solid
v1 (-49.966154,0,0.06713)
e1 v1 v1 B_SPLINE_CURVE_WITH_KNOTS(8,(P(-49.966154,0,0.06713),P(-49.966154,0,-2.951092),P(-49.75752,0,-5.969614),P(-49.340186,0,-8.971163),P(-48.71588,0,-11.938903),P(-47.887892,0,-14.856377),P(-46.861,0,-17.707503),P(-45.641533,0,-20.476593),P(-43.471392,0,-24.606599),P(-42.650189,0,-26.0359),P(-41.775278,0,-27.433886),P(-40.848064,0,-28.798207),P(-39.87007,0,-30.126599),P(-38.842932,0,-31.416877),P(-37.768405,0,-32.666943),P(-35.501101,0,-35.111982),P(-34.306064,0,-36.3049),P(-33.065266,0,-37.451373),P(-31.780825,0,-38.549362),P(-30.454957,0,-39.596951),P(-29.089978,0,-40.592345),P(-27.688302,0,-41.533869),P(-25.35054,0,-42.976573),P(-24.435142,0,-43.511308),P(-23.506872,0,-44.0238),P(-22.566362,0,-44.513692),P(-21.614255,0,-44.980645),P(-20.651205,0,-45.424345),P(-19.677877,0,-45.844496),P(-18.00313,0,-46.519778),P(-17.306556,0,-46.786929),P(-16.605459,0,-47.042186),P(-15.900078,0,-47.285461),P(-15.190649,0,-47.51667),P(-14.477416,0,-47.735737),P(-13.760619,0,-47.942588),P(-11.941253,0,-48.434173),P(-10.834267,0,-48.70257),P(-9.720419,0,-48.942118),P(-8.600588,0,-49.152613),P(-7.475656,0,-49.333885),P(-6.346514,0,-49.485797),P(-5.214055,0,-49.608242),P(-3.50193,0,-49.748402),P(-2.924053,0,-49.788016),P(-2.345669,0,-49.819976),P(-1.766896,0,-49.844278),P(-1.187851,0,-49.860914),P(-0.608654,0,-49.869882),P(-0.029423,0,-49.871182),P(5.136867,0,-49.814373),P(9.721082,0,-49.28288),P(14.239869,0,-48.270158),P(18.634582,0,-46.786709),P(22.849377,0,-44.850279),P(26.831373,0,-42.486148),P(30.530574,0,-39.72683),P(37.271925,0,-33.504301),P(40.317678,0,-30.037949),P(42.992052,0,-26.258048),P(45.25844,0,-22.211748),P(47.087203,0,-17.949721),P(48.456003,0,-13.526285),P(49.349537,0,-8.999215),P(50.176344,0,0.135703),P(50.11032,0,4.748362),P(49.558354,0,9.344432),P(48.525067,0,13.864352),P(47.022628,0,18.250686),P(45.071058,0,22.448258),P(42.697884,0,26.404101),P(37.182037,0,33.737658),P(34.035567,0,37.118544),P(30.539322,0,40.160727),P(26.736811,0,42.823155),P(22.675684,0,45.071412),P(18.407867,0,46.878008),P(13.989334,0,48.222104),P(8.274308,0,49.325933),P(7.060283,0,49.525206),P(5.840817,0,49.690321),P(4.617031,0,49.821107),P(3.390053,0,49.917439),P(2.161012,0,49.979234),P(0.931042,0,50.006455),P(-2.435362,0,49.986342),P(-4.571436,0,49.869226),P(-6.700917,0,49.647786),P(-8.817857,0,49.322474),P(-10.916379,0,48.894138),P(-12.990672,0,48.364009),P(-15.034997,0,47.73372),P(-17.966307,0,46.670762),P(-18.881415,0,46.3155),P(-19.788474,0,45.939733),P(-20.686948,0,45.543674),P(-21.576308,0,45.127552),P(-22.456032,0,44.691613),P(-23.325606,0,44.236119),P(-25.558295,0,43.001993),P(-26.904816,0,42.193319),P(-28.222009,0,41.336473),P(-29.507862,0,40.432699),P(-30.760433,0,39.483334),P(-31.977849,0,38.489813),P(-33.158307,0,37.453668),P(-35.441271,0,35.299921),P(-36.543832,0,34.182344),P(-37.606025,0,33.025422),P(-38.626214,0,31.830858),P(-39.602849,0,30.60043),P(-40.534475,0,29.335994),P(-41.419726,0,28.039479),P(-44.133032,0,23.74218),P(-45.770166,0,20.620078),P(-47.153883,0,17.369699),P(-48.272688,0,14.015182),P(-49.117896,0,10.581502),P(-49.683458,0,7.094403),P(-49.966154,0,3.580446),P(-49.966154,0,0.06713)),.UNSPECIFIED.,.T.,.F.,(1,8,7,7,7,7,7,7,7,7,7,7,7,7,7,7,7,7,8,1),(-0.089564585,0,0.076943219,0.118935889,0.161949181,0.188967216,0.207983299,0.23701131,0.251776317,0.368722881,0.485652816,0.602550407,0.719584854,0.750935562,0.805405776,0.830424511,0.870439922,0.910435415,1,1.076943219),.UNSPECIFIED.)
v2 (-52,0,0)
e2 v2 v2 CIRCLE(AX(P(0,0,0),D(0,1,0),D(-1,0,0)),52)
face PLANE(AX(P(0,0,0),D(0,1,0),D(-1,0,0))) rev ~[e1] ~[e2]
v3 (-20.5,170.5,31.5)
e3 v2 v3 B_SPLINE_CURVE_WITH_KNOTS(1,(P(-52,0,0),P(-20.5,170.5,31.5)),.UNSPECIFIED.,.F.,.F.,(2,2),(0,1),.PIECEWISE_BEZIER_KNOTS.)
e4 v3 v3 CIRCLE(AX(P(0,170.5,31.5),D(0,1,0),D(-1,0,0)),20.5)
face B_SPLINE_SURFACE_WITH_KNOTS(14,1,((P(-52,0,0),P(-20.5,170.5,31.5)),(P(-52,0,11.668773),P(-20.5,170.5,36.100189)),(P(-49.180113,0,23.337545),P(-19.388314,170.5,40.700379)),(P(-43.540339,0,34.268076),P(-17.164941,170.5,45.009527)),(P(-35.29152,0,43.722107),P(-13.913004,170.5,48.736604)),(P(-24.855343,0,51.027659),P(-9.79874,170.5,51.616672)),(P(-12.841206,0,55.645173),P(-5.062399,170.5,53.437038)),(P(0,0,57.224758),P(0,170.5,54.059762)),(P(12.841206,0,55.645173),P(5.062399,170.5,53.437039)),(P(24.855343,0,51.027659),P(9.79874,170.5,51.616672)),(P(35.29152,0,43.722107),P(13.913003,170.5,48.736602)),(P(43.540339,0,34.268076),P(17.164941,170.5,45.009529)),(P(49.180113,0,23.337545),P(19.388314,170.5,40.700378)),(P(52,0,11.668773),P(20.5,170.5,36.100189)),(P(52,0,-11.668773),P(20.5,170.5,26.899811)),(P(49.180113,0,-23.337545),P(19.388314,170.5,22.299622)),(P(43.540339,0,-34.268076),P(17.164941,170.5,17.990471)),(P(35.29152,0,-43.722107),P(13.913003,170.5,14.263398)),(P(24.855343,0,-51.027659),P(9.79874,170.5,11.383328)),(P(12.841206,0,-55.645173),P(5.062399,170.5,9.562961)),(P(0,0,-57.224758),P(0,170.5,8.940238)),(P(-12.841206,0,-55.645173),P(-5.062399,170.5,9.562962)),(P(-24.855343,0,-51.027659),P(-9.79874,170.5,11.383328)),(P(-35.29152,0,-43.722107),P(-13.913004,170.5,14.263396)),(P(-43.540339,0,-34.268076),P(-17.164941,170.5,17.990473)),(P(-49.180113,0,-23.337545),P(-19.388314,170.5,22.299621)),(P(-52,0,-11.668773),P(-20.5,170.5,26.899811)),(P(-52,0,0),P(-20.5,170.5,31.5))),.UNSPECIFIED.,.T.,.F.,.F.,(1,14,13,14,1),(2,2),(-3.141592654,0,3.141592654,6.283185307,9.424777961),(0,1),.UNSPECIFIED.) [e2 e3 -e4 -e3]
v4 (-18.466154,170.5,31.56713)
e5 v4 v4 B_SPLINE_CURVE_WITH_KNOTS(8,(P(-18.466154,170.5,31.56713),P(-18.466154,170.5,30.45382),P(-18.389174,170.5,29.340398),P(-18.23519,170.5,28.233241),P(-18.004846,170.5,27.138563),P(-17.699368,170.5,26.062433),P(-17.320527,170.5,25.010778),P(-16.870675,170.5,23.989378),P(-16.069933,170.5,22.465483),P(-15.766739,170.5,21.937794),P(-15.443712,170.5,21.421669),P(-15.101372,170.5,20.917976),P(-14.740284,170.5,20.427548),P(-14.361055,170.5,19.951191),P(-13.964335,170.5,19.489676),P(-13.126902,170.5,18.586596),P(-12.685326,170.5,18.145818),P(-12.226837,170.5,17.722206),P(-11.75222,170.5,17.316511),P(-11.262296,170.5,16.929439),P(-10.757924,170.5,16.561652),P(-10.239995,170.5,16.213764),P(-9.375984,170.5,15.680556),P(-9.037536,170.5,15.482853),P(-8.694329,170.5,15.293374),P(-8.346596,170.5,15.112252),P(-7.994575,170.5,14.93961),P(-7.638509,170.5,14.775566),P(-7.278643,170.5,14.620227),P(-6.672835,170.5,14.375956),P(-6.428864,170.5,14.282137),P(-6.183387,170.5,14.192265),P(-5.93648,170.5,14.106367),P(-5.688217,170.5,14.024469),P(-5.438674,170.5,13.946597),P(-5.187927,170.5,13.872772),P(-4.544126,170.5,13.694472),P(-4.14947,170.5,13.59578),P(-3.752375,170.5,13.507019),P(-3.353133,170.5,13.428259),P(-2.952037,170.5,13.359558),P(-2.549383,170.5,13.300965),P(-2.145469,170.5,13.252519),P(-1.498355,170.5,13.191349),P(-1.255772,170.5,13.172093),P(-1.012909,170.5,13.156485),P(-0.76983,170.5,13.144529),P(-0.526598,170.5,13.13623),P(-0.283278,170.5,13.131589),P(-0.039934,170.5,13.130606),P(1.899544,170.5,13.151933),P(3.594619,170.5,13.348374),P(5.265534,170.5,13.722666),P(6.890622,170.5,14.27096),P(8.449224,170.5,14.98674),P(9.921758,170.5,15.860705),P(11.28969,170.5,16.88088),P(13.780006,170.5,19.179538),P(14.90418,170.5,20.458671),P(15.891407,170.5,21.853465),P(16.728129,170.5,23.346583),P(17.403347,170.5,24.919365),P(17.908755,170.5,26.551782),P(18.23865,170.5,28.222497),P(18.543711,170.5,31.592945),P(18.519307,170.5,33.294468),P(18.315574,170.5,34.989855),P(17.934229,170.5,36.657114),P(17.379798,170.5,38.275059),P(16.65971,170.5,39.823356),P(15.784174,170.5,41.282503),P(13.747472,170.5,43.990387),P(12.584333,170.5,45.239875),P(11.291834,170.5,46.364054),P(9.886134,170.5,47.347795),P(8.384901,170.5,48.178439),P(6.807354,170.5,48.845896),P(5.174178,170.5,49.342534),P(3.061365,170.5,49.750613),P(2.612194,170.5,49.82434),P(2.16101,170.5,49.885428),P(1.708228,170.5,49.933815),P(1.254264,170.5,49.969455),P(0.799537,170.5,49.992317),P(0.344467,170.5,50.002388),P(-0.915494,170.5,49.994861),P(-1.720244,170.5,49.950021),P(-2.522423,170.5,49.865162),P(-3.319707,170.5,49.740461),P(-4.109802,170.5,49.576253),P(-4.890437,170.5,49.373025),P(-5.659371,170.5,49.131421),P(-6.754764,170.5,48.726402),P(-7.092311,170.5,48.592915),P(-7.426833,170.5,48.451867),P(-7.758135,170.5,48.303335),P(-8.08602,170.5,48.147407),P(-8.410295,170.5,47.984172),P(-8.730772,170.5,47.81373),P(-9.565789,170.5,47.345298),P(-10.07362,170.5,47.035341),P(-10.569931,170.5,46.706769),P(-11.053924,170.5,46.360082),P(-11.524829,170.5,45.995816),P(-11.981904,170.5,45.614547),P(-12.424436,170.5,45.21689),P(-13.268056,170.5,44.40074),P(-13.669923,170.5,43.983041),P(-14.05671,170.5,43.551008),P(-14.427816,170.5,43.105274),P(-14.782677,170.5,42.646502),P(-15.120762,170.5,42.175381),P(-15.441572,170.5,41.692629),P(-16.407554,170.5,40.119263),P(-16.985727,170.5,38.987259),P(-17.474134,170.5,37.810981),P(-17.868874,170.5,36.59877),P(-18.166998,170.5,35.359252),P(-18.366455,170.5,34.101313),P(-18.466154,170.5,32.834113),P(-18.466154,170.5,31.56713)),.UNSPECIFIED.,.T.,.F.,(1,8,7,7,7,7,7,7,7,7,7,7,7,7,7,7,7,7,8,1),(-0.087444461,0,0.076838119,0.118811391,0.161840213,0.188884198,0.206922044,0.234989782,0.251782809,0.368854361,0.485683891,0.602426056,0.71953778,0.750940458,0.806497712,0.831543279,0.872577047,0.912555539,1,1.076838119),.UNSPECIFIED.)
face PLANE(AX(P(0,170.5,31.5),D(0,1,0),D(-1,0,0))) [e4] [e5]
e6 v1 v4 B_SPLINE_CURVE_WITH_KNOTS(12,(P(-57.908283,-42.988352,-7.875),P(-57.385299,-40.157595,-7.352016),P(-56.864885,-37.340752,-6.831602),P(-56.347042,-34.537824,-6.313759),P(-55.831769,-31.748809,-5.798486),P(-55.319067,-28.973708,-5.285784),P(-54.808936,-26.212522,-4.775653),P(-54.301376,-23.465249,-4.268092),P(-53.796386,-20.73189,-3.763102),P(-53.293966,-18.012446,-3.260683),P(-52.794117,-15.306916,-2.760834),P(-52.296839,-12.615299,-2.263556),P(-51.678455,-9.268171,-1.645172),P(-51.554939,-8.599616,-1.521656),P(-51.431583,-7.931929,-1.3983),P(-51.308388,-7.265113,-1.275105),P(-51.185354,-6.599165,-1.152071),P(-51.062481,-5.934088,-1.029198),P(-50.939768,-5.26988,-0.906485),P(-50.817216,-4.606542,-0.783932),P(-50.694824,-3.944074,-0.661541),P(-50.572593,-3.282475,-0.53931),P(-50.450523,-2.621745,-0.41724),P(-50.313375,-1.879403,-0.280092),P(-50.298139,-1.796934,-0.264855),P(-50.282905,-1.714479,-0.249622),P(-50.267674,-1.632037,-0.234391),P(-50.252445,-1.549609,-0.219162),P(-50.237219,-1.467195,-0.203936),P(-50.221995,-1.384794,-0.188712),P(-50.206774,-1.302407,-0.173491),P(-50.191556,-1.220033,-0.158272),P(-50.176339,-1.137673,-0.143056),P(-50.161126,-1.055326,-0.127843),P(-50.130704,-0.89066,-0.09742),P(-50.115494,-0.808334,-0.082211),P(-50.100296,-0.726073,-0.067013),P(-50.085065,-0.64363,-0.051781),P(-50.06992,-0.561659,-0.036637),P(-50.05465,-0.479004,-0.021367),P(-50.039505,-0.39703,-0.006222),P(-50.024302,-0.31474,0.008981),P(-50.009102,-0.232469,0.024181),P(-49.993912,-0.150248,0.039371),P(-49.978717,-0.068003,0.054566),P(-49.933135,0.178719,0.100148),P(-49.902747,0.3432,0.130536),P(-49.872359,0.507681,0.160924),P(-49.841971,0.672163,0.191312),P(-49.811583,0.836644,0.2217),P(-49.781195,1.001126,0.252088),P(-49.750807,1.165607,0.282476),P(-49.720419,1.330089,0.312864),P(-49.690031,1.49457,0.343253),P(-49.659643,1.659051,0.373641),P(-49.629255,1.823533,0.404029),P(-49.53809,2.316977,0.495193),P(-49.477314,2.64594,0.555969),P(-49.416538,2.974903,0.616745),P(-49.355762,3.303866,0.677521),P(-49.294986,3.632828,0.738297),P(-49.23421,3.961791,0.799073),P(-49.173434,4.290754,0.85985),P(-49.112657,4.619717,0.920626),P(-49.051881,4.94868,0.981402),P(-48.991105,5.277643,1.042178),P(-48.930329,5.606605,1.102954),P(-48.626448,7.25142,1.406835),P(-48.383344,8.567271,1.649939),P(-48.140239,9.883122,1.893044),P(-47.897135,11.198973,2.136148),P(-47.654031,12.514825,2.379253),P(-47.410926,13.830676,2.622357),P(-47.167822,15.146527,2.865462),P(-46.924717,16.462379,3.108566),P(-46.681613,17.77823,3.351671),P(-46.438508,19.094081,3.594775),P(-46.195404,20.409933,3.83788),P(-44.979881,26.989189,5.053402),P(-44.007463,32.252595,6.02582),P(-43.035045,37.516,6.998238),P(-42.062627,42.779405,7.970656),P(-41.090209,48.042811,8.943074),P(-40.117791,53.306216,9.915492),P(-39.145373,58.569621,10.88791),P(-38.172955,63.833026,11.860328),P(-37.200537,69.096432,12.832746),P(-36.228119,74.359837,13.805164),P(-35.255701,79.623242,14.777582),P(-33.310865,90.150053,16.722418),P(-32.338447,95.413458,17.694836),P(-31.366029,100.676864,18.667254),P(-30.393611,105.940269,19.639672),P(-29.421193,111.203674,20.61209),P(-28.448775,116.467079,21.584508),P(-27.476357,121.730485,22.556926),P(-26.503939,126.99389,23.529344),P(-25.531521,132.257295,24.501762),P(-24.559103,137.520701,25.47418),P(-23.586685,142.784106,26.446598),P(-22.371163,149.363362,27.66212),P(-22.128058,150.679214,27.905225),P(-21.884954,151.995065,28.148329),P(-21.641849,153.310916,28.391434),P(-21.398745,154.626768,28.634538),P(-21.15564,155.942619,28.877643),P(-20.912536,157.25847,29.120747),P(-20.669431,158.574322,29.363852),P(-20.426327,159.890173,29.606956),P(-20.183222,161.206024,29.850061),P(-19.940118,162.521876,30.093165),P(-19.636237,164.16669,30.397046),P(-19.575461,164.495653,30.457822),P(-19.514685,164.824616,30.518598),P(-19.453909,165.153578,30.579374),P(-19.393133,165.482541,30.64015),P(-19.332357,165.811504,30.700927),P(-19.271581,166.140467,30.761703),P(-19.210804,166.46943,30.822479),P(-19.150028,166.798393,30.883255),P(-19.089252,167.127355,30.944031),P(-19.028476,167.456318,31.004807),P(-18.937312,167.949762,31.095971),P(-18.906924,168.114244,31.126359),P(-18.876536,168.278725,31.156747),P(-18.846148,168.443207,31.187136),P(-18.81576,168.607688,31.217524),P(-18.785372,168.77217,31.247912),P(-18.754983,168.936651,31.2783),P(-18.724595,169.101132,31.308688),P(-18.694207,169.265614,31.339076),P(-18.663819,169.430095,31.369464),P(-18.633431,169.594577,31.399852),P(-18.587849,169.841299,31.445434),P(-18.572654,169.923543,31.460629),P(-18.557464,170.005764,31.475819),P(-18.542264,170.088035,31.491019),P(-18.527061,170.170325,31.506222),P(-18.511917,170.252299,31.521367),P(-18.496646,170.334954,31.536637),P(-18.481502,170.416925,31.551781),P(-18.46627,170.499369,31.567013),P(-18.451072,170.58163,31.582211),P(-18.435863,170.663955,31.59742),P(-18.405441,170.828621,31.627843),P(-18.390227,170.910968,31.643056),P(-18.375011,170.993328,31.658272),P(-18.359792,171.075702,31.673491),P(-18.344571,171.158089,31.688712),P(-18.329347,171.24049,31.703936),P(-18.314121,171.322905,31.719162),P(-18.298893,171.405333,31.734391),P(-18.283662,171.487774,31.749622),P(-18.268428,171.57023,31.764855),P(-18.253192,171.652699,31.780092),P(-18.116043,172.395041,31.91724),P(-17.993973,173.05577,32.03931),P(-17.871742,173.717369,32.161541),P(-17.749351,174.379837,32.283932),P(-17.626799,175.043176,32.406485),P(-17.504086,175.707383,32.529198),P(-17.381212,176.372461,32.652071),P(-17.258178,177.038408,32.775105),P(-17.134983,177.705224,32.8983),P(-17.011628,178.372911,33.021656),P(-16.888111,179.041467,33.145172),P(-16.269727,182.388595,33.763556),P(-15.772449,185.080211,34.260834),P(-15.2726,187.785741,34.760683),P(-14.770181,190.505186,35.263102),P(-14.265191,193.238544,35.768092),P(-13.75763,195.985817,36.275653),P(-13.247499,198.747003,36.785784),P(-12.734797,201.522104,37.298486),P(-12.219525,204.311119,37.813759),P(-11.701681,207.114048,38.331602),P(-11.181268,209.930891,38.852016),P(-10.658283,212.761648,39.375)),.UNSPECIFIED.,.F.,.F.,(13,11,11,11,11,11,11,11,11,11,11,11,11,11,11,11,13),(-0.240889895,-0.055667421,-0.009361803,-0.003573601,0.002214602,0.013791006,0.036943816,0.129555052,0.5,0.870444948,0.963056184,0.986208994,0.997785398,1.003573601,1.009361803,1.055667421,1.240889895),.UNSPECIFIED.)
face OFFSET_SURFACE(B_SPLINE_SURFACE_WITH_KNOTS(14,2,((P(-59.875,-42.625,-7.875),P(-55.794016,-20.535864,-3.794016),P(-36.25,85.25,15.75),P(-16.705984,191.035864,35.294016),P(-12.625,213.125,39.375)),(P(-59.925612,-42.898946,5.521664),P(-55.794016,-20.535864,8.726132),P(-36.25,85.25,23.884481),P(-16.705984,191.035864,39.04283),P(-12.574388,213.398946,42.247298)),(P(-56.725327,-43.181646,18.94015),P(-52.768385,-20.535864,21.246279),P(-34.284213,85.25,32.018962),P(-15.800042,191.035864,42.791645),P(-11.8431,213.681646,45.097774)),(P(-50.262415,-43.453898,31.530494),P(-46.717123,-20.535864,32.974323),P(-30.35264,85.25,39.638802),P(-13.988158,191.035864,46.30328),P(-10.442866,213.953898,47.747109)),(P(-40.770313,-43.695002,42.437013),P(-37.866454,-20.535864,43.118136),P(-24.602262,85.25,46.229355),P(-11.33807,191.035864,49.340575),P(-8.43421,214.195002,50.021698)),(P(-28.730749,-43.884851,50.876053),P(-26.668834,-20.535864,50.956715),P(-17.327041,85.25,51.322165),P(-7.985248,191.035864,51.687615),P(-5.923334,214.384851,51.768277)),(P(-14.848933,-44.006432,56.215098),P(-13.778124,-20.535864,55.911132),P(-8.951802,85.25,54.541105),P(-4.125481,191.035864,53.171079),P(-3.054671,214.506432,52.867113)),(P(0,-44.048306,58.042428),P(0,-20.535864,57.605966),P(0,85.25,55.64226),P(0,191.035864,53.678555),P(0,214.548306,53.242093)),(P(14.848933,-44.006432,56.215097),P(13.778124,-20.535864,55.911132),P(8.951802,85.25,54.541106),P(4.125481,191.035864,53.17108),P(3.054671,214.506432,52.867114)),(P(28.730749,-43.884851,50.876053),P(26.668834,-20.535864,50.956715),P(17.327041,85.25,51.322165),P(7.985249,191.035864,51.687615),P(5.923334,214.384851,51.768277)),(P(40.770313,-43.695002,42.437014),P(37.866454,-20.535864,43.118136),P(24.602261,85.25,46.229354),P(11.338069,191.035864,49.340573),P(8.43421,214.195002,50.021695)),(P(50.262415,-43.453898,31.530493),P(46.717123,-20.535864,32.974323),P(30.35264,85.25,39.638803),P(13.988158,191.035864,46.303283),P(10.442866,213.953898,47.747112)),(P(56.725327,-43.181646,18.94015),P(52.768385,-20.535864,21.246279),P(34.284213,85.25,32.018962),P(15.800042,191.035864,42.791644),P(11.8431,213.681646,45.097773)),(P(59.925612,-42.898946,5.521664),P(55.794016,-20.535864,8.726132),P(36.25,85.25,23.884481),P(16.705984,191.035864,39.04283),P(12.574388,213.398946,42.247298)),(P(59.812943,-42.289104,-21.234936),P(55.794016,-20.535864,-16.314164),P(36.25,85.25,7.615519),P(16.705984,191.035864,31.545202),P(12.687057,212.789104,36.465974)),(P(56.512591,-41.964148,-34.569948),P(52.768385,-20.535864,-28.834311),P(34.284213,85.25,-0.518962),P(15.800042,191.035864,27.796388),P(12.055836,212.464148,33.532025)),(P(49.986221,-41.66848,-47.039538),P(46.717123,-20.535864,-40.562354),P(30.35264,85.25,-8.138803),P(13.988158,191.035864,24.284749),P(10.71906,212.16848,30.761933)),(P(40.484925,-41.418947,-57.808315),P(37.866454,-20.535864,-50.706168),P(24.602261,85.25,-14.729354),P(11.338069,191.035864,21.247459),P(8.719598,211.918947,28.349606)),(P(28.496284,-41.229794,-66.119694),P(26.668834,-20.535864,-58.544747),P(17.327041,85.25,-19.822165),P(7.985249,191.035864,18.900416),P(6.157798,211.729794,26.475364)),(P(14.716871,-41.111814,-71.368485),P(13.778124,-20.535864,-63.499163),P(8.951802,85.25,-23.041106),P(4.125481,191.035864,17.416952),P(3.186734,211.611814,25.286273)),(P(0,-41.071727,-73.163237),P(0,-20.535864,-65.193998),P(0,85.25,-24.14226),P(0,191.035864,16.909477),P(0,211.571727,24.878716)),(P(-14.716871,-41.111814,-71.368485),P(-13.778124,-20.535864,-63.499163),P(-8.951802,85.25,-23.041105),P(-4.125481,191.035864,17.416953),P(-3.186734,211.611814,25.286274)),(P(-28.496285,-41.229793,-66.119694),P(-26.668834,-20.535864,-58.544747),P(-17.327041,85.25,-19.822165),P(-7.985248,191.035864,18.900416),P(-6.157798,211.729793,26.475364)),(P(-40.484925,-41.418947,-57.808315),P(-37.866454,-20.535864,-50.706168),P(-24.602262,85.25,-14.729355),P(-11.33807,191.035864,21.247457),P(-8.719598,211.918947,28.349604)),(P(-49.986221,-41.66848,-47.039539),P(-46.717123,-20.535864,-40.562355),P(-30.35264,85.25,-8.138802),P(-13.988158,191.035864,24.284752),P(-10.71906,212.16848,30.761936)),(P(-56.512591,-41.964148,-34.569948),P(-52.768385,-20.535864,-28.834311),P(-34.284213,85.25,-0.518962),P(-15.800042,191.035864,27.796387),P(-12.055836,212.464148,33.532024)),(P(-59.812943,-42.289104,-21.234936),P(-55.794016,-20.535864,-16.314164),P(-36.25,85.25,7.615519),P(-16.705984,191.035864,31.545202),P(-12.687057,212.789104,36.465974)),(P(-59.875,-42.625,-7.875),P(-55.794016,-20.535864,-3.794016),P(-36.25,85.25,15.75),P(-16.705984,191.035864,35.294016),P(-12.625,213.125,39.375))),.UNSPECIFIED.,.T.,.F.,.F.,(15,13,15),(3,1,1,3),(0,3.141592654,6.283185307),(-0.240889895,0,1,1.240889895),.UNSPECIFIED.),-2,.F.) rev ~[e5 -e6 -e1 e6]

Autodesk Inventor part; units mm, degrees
ref_plane "YZ Plane" through (0, 0, 0) normal (1, 0, 0) x (0, 1, 0)
ref_plane "XY Plane" through (0, 0, 0) normal (0, 0, 1) x (1, 0, 0)
sketch "Szkic6" plane through (0, 0, 0) normal (0, 1, 0) x (-1, 0, 0)
  circle A0 centre (0, 0) radius 52
  dimension "d33" = 104
ref_plane "Płaszczyzna konstrukcyjna1" through (0, 170.5, 0) normal (0, 1, 0) x (-1, 0, 0)
sketch "Szkic7" plane through (0, 170.5, 0) normal (0, 1, 0) x (-1, 0, 0)
  circle A0 centre (0, 31.5) radius 20.5
  line L0 (0, -20.3) -> (0, 20.3) construction
  circle A1 centre (0, 0) radius 52 construction
  dimension "d35" = 41
loft "Wyciągnięcie złożone1" add profiles "Szkic6", "Szkic7"
shell "Skorupa1" thickness 2 removed faces 2 at (4.592, 170.5, 33.9101) at (-18.5271, 0, 25.061)
equation "\"d33\" = OD1"
equation "\"d35\" = OD2"
equation "\"d52\" = THK"
equation "\"SzerokośćGięciaPodcięcia\" = Grubość"
equation "\"RozmiarPodcięciaNarożnika\" = 4 * Grubość"
equation "\"PromieńPrzejścia\" = PromieńGięcia"
equation "\"Rozmiar_promienia_Jacobiego\" = PromieńGięcia"
equation "\"Wielk_odstępu\" = Grubość"
equation "\"d2\" = PromieńGięcia"
equation "\"d23\" = PromieńGięcia"
equation "\"OD1\" = 104"
equation "\"OD2\" = 41"
equation "\"L\" = 170.5"
equation "\"THK\" = 2"
equation "\"d34\" = L"
equation "\"Grubość\" = 1.5"
equation "\"PromieńGięcia\" = 3"
properties part number "Redukcja asymetryczna Ø104x41x2 L=170,5" material "304"
